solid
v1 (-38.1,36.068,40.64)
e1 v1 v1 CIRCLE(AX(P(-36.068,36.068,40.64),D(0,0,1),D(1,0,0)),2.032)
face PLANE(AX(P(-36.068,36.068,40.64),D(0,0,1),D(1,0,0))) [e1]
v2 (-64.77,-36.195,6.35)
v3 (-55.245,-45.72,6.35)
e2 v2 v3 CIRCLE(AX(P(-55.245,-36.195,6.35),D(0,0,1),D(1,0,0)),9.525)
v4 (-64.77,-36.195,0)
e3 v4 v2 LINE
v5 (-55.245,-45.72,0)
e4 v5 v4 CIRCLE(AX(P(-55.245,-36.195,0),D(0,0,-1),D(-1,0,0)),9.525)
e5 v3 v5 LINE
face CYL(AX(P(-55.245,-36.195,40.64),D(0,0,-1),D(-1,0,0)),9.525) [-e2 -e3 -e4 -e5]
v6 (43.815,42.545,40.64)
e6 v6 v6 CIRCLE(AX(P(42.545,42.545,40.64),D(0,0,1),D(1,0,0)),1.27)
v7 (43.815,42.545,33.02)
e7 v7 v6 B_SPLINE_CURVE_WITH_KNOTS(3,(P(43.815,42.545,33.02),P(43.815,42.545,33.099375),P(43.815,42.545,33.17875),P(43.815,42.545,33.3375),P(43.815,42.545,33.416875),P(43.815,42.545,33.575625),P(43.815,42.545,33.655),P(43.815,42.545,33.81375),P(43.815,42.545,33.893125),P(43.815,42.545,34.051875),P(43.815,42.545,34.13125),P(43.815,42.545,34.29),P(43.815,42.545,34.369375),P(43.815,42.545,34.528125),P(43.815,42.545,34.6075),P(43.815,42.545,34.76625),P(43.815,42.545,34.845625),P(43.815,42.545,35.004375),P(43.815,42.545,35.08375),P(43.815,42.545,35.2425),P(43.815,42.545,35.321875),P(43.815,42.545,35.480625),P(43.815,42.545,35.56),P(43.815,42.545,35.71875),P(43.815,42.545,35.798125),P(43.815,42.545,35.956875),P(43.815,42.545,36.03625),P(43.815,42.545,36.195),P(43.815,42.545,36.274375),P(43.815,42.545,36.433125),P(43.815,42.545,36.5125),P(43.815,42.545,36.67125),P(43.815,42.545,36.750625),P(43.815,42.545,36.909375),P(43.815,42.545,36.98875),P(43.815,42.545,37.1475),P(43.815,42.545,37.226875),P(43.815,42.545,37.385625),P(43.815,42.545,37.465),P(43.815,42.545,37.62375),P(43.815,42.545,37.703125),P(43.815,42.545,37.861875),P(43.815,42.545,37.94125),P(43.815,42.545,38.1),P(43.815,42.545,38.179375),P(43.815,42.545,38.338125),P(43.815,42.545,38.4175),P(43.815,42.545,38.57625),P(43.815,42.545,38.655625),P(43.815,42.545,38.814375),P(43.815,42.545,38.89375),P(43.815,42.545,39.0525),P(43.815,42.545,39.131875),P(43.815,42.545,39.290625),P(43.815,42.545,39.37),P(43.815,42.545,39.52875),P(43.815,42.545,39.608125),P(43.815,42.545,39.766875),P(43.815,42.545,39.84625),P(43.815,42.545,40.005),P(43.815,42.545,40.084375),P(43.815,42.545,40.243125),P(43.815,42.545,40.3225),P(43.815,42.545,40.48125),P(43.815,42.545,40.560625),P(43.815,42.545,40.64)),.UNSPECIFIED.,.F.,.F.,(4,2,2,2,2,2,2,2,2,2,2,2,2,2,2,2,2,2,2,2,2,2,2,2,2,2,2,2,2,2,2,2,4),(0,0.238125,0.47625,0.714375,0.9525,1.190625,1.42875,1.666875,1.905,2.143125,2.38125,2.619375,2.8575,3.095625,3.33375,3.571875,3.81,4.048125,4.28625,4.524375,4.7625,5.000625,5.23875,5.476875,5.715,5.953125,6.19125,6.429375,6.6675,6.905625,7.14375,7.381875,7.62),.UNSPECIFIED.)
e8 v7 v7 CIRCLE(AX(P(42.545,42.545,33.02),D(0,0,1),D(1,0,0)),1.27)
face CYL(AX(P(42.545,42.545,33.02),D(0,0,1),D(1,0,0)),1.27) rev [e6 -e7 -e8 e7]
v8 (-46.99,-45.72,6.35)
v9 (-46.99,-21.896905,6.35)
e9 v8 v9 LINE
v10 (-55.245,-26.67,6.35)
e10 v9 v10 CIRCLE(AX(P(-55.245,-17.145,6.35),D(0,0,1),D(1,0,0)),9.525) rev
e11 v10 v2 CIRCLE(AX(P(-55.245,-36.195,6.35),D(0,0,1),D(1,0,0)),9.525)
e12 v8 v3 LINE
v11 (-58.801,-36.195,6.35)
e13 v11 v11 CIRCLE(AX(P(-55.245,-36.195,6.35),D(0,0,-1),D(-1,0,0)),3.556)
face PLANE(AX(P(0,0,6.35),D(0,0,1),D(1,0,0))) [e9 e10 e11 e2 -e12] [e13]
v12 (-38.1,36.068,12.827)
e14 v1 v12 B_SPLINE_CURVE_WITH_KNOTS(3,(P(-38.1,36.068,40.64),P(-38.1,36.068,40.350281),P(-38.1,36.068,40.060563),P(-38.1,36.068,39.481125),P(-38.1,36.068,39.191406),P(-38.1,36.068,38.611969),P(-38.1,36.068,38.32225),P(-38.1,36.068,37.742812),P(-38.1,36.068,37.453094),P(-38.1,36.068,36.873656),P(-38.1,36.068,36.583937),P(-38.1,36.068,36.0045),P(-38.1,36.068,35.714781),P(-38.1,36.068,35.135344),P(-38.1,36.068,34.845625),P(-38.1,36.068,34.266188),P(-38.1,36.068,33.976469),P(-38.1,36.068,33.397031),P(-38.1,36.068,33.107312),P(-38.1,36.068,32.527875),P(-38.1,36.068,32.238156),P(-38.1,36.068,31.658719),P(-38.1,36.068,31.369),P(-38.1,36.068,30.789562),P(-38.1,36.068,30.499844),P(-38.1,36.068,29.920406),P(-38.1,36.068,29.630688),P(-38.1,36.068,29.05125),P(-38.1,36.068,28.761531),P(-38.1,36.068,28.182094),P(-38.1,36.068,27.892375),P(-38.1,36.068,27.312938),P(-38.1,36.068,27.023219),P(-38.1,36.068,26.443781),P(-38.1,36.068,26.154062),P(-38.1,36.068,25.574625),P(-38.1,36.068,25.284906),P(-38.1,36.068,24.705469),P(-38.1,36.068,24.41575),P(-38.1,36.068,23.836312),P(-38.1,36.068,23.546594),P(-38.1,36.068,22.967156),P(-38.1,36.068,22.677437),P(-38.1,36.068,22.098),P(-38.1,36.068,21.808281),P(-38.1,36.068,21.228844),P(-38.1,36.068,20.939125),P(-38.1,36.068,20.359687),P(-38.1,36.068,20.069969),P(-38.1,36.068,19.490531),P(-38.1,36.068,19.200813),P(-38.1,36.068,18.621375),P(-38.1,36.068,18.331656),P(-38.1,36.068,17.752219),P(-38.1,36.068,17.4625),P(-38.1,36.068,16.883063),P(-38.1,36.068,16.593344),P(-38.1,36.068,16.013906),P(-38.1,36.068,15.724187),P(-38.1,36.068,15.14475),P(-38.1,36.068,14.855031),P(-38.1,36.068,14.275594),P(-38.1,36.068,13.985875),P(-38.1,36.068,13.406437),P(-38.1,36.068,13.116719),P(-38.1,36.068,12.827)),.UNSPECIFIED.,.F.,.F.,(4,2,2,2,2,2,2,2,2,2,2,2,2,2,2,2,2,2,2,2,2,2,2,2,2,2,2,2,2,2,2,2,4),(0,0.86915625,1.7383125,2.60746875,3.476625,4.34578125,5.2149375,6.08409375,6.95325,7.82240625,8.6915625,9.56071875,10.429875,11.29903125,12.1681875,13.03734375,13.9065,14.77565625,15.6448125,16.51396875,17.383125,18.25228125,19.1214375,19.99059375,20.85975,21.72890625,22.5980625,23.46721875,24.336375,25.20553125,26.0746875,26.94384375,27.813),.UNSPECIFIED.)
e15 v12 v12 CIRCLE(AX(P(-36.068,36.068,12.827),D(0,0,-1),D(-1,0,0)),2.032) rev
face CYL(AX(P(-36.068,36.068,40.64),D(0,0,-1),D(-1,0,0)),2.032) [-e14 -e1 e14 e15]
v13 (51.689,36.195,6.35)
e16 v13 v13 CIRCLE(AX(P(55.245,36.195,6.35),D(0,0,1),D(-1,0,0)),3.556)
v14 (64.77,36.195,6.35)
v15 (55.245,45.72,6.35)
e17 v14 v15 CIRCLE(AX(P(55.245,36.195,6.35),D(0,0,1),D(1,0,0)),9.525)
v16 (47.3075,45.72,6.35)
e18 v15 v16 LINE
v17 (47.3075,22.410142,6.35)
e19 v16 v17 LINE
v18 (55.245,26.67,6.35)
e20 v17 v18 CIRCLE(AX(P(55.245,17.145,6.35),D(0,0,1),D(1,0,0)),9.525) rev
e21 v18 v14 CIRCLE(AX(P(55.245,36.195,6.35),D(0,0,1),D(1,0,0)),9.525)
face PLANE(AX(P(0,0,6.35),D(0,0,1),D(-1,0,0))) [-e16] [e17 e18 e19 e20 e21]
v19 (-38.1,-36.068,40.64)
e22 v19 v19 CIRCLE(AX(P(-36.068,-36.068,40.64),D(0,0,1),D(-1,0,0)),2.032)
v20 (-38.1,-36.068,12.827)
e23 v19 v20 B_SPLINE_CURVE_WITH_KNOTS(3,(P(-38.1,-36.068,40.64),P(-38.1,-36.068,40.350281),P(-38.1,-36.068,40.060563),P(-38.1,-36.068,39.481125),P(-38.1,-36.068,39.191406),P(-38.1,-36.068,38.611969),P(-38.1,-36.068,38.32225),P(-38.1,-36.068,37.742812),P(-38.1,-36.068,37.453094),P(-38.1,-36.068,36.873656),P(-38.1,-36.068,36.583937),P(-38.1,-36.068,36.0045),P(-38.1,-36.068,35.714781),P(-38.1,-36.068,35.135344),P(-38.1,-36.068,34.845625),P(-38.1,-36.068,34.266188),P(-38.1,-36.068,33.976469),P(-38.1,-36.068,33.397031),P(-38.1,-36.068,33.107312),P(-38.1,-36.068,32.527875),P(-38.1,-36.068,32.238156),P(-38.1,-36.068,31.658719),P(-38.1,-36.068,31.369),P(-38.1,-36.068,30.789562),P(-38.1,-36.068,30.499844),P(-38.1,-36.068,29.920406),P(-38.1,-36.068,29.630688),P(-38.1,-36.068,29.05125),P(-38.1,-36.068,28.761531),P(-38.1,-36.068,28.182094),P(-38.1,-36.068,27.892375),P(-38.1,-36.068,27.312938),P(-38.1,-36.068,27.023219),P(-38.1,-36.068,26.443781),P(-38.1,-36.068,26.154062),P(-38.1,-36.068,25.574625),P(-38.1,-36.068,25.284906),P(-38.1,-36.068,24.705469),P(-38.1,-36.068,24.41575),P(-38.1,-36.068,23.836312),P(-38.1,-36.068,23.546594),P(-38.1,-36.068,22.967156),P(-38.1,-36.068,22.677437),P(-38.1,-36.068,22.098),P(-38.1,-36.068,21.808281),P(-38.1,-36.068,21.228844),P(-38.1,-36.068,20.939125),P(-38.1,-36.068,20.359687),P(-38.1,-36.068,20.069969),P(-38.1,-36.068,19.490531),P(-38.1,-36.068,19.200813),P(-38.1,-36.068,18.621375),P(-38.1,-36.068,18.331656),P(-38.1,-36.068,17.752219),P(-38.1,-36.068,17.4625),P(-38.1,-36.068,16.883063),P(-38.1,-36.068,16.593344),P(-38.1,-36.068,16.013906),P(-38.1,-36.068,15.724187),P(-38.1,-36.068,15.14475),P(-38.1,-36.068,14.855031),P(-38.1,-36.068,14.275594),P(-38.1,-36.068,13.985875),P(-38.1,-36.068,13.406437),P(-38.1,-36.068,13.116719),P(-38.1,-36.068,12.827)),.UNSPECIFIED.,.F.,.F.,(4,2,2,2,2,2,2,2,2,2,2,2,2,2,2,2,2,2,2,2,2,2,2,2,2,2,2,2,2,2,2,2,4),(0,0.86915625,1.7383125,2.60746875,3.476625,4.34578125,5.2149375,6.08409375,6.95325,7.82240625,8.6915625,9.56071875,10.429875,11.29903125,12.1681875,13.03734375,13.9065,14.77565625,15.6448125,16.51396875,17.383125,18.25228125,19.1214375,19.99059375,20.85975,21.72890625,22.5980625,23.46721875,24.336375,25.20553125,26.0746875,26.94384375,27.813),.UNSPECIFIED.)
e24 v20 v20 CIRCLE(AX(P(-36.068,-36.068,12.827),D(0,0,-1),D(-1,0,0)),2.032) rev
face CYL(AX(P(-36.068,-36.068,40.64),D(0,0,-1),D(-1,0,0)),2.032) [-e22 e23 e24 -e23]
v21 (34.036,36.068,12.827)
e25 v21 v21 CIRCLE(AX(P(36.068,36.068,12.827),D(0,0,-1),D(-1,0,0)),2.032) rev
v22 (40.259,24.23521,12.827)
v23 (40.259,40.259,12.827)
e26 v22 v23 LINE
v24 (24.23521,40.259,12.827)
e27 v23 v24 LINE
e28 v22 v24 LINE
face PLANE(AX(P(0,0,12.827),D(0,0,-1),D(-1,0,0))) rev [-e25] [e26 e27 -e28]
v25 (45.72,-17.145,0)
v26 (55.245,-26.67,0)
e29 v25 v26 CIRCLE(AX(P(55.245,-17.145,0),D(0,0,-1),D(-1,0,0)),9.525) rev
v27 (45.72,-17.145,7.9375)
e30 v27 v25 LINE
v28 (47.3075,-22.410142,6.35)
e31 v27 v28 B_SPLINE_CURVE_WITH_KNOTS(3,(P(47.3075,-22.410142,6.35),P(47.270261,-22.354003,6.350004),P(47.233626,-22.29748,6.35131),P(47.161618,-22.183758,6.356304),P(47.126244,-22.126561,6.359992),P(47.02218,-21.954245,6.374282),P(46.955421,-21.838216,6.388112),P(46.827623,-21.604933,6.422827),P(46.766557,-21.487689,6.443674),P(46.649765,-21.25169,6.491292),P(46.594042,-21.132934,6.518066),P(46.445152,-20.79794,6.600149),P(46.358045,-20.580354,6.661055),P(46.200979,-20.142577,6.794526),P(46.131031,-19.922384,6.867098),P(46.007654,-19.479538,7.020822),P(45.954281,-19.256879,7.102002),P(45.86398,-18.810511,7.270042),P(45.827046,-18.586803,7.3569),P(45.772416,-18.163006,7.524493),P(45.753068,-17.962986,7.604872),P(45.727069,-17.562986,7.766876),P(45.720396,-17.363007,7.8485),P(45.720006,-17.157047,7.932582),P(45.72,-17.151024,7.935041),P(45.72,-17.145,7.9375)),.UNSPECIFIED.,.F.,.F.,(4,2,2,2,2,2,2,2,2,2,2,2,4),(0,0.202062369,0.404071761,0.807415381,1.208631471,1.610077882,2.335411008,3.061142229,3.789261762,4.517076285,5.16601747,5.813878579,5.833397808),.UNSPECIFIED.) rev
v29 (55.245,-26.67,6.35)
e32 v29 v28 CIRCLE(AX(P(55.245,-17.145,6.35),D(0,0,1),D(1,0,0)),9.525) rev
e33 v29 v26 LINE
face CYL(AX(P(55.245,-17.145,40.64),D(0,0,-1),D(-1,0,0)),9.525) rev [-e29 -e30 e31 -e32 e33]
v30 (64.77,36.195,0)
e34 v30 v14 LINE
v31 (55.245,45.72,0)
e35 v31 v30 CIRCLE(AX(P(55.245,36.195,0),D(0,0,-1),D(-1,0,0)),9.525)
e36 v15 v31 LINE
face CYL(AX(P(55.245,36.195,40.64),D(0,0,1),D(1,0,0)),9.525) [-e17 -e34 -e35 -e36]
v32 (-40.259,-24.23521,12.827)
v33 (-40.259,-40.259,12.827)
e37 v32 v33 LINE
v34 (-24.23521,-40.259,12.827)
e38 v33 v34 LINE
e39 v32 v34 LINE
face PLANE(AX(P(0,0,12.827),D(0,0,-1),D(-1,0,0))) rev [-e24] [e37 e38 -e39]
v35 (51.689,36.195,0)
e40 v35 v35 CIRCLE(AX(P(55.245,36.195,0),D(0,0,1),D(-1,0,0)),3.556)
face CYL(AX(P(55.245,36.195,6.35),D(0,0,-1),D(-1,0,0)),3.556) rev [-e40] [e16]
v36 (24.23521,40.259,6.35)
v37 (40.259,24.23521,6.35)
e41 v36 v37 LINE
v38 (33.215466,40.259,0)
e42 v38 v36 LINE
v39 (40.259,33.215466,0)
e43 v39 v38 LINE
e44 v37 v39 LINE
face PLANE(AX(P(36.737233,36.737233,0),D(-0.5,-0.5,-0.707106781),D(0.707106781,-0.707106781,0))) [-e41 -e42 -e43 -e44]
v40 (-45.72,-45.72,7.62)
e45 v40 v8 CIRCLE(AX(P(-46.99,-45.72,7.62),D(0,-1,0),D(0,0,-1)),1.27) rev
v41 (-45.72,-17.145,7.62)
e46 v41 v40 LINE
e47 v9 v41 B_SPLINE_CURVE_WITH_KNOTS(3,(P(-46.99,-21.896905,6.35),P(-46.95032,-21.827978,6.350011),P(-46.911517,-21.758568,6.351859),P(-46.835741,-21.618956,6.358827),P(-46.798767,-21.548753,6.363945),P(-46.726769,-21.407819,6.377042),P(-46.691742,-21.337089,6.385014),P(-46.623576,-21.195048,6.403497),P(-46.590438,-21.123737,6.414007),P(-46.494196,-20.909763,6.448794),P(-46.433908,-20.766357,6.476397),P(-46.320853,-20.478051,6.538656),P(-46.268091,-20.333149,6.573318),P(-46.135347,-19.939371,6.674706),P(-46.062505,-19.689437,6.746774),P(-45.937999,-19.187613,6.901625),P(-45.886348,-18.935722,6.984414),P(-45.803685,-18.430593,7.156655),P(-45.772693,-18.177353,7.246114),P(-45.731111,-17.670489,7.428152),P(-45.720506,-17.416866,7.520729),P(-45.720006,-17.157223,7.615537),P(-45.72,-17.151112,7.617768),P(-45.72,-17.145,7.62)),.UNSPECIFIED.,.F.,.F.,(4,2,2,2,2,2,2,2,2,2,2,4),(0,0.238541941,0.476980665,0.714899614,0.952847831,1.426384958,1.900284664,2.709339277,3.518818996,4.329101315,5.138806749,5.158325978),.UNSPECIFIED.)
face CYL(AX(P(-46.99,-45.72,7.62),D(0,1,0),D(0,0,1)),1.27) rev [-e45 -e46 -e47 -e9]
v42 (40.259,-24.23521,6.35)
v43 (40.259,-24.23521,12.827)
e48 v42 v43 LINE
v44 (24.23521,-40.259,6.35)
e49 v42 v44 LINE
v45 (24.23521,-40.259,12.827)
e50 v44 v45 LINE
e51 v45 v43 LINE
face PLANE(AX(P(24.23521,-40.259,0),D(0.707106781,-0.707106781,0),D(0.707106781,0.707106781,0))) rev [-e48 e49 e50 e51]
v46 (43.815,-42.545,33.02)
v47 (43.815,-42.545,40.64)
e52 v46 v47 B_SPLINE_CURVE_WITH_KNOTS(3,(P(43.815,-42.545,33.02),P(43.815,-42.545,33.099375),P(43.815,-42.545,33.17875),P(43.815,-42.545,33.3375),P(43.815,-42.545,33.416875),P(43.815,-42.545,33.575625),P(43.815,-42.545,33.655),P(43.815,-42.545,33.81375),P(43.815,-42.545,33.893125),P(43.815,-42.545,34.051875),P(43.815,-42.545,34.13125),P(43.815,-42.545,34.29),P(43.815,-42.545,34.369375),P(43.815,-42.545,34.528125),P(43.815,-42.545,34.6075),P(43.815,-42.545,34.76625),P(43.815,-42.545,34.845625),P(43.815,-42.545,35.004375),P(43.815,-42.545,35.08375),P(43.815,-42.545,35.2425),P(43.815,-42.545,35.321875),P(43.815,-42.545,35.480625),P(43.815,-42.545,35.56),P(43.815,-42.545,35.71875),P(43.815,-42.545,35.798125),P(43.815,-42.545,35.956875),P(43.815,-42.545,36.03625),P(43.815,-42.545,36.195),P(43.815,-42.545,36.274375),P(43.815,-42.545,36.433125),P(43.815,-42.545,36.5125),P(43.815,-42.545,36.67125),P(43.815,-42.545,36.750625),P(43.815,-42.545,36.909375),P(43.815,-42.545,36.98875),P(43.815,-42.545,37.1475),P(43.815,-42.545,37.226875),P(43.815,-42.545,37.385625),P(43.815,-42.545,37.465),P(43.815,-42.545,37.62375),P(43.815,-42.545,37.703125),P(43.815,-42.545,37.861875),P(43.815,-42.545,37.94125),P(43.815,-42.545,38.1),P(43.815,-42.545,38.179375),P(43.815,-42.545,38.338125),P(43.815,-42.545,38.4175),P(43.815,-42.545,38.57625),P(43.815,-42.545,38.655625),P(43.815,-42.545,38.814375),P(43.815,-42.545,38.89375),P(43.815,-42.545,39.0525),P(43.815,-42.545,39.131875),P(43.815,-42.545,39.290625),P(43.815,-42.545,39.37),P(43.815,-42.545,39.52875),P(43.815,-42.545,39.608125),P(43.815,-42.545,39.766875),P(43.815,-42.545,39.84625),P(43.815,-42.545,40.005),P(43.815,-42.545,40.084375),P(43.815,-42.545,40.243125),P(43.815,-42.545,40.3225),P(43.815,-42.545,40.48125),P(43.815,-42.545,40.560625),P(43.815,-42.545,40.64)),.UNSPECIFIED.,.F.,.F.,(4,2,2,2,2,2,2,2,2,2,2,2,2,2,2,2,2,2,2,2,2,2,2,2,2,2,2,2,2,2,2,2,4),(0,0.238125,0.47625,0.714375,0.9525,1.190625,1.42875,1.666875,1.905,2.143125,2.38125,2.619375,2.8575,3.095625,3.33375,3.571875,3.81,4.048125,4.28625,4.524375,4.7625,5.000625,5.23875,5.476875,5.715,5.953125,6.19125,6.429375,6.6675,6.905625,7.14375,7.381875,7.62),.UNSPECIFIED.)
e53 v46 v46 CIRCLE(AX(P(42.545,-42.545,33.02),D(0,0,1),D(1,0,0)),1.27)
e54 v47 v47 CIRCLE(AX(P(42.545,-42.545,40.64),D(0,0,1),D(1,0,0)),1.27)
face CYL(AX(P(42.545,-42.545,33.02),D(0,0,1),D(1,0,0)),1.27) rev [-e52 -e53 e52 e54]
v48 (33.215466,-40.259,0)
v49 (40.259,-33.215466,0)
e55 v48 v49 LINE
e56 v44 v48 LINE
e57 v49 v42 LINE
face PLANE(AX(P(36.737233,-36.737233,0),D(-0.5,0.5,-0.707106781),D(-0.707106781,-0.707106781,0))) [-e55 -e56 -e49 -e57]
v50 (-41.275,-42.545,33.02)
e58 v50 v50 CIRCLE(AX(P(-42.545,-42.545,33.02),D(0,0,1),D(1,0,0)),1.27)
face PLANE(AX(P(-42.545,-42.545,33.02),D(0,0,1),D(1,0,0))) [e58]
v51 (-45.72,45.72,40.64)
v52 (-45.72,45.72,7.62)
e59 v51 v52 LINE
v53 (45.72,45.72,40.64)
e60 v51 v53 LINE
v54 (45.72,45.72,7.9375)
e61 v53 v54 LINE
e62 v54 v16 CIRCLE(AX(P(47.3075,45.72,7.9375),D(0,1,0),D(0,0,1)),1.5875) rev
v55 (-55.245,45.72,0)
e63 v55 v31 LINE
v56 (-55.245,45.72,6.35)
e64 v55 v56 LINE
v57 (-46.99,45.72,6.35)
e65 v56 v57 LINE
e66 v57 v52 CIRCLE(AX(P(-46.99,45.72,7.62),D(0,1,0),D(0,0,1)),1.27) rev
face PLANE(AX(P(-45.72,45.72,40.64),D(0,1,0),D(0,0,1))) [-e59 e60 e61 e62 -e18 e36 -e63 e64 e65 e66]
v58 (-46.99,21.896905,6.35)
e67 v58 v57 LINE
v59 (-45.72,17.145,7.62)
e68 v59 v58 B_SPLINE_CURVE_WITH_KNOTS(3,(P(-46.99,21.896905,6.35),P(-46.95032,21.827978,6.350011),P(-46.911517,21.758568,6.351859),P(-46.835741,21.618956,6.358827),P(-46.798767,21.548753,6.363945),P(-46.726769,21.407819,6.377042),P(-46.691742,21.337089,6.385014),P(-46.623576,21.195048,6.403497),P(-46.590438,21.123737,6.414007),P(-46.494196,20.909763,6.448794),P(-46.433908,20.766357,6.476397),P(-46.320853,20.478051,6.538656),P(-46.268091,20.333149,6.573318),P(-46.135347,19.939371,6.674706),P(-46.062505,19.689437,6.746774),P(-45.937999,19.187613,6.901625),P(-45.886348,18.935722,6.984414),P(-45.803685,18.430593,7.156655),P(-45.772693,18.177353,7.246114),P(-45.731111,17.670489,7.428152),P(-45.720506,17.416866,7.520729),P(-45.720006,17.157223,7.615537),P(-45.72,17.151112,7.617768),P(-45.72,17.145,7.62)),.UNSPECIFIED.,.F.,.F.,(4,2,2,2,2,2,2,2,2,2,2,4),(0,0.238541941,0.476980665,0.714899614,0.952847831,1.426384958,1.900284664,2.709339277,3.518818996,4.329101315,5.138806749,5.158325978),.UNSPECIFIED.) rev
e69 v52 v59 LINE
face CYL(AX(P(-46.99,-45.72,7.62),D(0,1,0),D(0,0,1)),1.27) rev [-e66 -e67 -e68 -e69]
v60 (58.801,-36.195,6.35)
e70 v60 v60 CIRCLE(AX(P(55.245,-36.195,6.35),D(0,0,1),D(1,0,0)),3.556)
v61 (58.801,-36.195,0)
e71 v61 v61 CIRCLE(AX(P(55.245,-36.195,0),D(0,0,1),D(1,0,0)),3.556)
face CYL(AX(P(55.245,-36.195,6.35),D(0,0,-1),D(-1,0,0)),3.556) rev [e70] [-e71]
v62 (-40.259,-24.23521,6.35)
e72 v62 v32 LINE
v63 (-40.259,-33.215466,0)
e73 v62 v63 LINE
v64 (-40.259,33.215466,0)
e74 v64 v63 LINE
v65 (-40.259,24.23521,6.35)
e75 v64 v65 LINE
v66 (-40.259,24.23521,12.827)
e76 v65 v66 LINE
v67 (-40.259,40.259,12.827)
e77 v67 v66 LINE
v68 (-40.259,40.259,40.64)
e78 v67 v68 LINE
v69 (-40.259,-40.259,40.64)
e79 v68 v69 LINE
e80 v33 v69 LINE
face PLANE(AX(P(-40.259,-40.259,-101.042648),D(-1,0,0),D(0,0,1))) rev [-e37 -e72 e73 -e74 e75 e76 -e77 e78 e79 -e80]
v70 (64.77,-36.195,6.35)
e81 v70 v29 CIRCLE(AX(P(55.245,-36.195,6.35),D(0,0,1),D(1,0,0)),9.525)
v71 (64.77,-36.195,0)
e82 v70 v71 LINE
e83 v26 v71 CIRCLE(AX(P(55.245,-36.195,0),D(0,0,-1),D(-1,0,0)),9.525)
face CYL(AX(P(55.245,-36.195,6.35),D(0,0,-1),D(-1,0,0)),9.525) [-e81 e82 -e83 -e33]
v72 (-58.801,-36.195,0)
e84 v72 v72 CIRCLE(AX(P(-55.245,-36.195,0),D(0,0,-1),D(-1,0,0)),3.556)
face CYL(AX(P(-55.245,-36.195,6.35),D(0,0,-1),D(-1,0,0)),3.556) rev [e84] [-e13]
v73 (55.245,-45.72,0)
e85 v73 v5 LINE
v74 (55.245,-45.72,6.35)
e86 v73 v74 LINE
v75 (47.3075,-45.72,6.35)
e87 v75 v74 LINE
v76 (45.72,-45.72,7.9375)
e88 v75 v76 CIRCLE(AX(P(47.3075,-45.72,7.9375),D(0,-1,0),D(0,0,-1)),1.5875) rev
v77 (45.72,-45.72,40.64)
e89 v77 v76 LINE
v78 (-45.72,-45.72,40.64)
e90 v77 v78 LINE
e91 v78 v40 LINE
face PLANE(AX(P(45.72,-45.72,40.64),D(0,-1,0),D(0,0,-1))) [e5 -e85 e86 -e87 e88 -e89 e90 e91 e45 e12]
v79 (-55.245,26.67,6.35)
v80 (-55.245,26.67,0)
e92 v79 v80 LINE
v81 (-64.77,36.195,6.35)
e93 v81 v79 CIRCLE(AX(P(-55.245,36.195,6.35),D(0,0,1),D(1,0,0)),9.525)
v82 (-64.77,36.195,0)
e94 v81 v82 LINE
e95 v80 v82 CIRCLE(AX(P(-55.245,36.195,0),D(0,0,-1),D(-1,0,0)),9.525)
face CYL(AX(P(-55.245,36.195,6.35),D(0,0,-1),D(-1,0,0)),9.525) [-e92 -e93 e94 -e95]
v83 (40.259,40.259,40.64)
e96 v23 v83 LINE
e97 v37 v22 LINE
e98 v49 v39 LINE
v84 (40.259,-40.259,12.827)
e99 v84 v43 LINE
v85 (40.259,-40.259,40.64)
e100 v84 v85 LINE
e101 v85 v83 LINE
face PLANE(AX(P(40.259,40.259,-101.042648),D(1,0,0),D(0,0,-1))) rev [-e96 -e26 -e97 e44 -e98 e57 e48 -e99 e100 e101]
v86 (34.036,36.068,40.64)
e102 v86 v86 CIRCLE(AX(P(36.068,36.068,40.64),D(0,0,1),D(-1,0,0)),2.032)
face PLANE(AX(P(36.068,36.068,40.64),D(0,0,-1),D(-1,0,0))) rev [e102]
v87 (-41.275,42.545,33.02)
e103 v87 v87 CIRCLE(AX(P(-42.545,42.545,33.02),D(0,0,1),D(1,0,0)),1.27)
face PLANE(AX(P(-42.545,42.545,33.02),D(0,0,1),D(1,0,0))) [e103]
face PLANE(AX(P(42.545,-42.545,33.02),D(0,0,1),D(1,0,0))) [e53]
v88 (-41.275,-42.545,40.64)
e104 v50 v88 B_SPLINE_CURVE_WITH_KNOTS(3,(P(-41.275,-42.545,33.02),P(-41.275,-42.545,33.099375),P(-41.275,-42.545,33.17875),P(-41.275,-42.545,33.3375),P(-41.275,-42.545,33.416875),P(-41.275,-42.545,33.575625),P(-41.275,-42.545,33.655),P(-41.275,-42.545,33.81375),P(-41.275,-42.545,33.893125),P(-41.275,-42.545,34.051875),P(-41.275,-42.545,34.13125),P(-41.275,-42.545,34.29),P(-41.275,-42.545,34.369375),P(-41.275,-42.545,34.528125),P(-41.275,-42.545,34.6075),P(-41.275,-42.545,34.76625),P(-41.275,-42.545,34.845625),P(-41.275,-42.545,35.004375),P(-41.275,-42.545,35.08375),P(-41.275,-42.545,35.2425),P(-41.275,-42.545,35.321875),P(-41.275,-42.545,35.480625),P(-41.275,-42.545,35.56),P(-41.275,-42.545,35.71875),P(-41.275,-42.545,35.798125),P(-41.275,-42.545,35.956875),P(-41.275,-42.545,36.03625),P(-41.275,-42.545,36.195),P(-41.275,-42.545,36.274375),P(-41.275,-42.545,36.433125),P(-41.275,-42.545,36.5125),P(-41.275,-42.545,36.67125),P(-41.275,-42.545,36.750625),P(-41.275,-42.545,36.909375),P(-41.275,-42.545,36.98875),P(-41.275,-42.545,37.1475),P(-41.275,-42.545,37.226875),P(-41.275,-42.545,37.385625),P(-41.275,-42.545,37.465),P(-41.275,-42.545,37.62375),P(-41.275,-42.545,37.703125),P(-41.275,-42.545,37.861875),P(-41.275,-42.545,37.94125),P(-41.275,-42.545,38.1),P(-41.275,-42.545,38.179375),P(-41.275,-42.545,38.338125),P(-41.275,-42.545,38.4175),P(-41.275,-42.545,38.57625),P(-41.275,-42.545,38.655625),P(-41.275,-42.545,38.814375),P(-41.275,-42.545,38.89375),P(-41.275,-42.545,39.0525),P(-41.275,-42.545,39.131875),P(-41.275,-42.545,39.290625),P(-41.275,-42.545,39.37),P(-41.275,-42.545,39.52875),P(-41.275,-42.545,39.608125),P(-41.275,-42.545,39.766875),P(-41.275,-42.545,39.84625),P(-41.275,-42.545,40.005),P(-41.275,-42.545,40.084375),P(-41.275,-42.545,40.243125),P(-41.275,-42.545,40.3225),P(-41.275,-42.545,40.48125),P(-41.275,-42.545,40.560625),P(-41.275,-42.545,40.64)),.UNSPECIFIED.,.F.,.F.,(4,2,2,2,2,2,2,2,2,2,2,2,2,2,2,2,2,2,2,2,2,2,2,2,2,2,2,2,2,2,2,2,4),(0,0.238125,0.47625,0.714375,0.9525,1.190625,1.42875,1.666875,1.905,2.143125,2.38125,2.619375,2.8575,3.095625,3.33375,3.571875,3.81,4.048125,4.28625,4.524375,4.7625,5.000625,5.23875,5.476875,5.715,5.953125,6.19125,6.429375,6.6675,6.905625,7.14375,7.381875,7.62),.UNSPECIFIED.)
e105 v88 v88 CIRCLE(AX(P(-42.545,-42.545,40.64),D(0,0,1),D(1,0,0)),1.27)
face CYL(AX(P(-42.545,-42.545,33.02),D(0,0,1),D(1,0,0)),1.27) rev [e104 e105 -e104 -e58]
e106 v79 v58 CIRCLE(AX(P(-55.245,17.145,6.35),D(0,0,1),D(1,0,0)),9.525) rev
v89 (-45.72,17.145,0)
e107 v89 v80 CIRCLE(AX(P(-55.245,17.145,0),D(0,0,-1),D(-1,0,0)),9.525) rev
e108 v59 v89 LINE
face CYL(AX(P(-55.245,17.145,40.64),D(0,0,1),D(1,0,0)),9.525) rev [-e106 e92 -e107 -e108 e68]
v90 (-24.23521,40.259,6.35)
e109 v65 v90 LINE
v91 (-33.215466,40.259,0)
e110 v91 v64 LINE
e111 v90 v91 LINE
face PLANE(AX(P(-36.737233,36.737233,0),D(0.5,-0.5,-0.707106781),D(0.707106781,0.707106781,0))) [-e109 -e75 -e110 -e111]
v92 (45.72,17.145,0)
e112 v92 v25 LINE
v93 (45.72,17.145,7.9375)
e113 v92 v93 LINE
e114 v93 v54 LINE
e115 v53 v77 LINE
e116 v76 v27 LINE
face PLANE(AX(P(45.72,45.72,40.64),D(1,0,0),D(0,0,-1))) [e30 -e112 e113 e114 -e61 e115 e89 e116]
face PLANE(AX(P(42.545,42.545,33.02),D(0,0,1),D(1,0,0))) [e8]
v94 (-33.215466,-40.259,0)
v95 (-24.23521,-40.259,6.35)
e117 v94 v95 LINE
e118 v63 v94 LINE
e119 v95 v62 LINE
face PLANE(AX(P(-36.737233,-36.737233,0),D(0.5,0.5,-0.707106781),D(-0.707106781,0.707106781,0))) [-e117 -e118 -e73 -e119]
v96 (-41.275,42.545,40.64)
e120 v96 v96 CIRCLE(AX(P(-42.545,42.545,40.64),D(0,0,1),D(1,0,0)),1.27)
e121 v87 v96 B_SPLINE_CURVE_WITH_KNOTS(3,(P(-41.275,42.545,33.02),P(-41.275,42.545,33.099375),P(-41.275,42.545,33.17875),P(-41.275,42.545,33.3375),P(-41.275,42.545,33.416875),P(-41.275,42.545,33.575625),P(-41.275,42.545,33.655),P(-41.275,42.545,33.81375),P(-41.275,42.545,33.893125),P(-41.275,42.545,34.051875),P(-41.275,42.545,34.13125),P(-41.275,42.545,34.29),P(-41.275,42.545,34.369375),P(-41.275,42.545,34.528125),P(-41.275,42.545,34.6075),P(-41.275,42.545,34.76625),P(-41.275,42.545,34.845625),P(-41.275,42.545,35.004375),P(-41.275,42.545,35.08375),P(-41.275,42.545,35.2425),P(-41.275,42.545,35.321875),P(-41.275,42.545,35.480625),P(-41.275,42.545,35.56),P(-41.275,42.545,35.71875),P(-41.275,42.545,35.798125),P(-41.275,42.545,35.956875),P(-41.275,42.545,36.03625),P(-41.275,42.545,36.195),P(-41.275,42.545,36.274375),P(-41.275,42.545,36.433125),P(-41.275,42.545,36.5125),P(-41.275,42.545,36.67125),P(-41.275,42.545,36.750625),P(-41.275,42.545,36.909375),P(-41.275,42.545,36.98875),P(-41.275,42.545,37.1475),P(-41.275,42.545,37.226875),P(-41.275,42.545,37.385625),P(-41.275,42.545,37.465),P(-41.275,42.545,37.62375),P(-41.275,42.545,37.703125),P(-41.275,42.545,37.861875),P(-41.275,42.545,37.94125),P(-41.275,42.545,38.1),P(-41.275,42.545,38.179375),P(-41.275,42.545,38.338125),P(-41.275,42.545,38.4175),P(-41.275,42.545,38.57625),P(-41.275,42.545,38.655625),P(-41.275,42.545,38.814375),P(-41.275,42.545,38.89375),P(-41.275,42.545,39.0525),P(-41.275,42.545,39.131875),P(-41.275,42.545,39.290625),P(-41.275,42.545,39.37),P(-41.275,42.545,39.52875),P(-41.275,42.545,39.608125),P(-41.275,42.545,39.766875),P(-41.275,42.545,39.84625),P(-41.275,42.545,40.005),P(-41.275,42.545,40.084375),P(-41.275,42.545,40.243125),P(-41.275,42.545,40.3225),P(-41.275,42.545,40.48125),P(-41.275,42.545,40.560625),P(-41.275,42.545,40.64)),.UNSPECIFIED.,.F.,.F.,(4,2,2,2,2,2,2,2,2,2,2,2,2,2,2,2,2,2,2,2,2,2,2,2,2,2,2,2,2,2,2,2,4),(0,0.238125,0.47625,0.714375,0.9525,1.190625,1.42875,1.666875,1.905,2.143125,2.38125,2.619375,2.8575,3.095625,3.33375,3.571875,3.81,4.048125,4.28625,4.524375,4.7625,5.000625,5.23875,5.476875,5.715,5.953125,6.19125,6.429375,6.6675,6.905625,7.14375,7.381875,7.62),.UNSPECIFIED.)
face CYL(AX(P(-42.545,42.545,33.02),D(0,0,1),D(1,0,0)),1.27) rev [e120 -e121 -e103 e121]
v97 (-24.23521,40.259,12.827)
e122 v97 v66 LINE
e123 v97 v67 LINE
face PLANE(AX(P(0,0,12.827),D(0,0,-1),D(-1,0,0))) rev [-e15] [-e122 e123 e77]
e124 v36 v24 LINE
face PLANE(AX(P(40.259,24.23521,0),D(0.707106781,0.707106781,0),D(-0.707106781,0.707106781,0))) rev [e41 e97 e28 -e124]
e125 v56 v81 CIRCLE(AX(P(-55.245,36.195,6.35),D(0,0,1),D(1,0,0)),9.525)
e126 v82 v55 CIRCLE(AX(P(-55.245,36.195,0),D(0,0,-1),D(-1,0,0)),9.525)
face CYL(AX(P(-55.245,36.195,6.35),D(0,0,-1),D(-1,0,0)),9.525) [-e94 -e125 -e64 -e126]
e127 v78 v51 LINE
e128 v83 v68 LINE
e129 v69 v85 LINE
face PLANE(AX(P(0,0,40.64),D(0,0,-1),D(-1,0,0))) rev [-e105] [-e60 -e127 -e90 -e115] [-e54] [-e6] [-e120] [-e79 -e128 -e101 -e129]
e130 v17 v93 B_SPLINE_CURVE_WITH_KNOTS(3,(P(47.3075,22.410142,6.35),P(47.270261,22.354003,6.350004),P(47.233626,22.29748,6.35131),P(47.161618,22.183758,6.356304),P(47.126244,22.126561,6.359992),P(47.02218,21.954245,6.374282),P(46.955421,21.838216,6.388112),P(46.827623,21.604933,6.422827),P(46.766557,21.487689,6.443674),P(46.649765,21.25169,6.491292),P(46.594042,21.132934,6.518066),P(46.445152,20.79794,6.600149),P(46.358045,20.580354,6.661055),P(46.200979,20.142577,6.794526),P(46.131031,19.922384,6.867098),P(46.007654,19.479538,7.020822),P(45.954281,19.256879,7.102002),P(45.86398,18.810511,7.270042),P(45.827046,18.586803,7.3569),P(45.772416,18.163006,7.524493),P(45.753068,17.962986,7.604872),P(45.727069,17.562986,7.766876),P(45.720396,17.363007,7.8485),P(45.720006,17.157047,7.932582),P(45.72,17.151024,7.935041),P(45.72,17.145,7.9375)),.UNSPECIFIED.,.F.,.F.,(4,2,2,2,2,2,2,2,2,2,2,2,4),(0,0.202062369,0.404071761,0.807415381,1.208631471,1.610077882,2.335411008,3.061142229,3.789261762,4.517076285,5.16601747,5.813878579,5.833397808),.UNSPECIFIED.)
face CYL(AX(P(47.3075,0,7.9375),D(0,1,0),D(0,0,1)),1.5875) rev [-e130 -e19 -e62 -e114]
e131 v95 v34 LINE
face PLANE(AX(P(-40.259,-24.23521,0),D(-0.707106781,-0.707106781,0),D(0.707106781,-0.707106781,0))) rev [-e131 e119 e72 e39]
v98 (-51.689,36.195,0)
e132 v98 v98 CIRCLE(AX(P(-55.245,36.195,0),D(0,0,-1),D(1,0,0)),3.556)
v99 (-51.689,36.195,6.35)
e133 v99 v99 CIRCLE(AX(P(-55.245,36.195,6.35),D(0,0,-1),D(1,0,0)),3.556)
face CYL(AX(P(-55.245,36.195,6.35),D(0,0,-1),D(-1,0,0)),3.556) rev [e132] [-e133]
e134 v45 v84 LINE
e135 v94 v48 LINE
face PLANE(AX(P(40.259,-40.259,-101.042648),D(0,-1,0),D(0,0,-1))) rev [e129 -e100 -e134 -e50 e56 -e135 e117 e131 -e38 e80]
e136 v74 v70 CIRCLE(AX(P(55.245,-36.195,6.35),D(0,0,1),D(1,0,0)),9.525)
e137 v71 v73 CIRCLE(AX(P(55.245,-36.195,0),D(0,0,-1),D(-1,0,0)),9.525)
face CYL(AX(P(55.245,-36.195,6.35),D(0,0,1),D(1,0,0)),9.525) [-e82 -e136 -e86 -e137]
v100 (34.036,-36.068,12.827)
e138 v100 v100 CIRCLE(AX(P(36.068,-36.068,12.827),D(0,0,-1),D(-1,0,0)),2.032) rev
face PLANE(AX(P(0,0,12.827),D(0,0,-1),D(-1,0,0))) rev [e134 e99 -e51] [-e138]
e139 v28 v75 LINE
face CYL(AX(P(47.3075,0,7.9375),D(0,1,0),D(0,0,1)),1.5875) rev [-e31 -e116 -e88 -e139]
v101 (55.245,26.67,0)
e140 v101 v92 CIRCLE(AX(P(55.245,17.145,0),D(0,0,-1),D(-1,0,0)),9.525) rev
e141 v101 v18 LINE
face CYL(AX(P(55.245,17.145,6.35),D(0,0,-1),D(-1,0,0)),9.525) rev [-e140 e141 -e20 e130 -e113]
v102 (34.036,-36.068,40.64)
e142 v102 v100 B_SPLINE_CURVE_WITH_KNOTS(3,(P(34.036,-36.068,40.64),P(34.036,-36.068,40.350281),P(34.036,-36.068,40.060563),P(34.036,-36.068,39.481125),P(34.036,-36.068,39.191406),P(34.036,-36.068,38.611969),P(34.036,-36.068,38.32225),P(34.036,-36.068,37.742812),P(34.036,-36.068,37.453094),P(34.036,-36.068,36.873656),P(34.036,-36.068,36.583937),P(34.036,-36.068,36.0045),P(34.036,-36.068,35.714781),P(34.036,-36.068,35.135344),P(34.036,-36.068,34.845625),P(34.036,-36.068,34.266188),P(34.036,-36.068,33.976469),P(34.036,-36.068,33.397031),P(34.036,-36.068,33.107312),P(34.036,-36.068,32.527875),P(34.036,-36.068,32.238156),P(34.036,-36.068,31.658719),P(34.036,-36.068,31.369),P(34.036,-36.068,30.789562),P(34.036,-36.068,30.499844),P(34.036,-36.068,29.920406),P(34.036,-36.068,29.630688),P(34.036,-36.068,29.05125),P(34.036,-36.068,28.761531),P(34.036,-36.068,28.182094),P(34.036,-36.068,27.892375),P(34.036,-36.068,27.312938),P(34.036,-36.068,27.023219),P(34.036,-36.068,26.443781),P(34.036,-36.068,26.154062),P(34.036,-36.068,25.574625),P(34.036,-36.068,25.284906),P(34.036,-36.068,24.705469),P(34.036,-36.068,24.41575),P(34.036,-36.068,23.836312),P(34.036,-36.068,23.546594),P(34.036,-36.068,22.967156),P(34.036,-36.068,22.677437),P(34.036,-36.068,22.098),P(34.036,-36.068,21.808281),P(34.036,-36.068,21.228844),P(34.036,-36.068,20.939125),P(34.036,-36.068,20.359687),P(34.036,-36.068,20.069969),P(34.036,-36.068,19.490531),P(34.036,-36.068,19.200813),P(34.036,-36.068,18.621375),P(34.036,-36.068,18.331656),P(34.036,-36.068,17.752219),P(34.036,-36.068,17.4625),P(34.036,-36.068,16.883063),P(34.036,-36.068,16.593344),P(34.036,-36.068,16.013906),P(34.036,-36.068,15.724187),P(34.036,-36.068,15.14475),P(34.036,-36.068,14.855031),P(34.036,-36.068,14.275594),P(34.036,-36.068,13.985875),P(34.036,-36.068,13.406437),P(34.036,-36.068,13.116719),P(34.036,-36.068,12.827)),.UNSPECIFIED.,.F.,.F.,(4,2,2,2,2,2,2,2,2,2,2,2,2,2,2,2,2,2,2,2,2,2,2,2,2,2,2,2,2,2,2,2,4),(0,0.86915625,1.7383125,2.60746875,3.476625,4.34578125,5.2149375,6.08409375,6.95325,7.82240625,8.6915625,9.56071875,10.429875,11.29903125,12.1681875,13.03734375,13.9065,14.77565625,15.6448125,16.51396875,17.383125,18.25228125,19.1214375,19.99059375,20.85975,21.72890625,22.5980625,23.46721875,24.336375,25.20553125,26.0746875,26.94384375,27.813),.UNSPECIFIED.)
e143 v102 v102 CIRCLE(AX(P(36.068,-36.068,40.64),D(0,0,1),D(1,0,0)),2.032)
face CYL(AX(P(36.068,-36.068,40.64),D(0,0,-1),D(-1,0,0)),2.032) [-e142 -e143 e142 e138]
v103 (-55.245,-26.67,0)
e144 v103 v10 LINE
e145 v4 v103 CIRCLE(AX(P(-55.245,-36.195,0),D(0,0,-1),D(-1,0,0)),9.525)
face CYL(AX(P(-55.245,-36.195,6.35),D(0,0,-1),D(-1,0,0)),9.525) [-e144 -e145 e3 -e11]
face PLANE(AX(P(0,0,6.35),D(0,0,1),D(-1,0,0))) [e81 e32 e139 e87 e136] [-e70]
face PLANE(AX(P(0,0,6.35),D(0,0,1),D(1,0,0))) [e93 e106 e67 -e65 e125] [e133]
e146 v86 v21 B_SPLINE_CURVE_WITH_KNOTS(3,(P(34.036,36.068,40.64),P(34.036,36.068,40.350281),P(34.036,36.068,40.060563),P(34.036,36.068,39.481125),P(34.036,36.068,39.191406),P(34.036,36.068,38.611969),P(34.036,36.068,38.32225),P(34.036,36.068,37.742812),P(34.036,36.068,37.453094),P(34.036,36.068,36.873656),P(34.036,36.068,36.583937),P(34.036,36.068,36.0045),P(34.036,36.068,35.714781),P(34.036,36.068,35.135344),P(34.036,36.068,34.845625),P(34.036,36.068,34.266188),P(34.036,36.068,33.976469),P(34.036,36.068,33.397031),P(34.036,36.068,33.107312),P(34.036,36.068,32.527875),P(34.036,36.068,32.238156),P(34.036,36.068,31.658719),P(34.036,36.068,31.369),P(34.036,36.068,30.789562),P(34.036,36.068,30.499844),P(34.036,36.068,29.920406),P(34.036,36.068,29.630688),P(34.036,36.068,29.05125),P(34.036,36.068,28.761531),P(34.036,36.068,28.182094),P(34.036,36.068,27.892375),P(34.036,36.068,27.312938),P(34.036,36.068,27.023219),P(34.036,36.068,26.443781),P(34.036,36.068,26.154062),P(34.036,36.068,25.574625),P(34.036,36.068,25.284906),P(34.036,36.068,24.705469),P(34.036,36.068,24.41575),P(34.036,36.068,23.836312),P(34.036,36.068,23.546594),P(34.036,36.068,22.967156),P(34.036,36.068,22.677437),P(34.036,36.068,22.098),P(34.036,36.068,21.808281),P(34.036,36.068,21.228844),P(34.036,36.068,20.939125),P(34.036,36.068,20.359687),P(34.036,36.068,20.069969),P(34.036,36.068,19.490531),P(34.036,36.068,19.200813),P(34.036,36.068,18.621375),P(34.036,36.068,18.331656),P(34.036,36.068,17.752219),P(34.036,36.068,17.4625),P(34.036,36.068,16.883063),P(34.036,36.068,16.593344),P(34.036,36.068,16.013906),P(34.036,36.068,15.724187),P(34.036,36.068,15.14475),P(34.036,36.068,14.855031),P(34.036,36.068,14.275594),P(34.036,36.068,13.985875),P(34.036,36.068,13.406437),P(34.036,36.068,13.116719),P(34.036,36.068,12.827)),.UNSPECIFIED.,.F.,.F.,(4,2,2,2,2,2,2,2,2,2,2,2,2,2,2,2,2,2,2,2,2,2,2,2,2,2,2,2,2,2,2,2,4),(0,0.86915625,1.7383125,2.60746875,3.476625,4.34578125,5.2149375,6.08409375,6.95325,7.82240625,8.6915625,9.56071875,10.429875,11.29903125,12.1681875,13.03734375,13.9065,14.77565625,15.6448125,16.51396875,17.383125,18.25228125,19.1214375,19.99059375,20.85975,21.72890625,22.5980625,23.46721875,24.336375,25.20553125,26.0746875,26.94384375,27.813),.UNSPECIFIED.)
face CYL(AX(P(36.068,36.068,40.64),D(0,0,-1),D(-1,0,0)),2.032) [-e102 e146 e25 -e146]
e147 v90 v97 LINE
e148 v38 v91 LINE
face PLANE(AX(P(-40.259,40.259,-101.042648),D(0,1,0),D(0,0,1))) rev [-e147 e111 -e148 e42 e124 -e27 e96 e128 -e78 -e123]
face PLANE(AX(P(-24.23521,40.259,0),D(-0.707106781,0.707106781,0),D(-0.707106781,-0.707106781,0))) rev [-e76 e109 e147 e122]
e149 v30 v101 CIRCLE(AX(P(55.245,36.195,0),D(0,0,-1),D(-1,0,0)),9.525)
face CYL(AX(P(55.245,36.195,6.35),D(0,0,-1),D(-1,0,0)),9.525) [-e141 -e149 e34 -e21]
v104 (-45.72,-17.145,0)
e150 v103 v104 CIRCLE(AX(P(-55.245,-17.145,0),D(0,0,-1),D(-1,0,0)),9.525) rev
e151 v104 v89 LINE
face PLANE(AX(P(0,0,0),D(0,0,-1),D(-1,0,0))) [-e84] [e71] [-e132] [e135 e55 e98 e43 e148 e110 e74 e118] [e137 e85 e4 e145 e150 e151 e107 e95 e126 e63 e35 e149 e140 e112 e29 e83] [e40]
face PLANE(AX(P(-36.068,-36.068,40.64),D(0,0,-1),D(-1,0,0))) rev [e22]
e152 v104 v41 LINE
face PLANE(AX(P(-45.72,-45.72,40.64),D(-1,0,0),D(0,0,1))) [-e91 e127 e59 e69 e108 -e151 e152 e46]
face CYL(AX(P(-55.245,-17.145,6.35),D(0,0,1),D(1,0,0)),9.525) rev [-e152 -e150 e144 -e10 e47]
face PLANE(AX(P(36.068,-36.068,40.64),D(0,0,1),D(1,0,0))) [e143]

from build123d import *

# Parameters (mm, degrees)
SKETCH1_W           = 80.01
SKETCH1_H           = 80.01
BOSS_EXTRUDE1_DEPTH = 12.827
SKETCH2_R           = 2.032
BOSS_EXTRUDE2_DEPTH = 27.813
SKETCH3_W           = 91.44
SKETCH3_H           = 91.44
SKETCH3_W_2         = 80.01
SKETCH3_H_2         = 80.01
BOSS_EXTRUDE3_DEPTH = 40.64
CUT_EXTRUDE1_DEPTH  = 71.386076528
SKETCH6_W           = 80.518
SKETCH6_H           = 80.518
SKETCH6_W_2         = 80.01
SKETCH6_H_2         = 80.01
CUT_EXTRUDE2_DEPTH  = 27.813
CUT_EXTRUDE3_DEPTH  = 71.386076528
SKETCH9_W           = 19.05
SKETCH9_H           = 19.05
SKETCH9_R           = 3.556
BOSS_EXTRUDE4_DEPTH = 6.35
FILLET1_R           = 9.525
FILLET2_R           = 1.27
FILLET3_R           = 9.525
FILLET4_R           = 1.5875
SKETCH10_R          = 1.27
CUT_EXTRUDE4_DEPTH  = 7.62
CHAMFER2_SIZE       = 6.35


with BuildPart() as part:
    # Sketch1 → Boss-Extrude1 (new body)
    with BuildSketch(Plane.XY):
        Rectangle(SKETCH1_W, SKETCH1_H)
    extrude(amount=BOSS_EXTRUDE1_DEPTH)

    # Sketch2 → Boss-Extrude2 (add)
    with BuildSketch(Plane.XY.offset(12.827)):
        with Locations(Location((-36.068, 36.068, 0), (0, 0, 180))):
            Circle(SKETCH2_R)
        with Locations(Location((36.068, 36.068, 0), (0, 0, 180))):
            Circle(SKETCH2_R)
        with Locations(Location((36.068, -36.068, 0), (0, 0, 180))):
            Circle(SKETCH2_R)
        with Locations(Location((-36.068, -36.068, 0), (0, 0, 180))):
            Circle(SKETCH2_R)
    extrude(amount=BOSS_EXTRUDE2_DEPTH)

    # Sketch3 → Boss-Extrude3 (add, through all)
    with BuildSketch(Plane(origin=(0, 0, 0), x_dir=(-1, 0, 0), z_dir=(0, 0, -1))):
        Rectangle(SKETCH3_W, SKETCH3_H)
        Rectangle(SKETCH3_W_2, SKETCH3_H_2, mode=Mode.SUBTRACT)
    extrude(amount=-BOSS_EXTRUDE3_DEPTH)

    # Sketch4 → Cut-Extrude1 (cut, through all)
    with BuildSketch(Plane.XY.offset(12.827)):
        Polygon((24.13, 40.005), (40.005, 24.13), (40.005, -24.13), (24.13, -40.005), (-24.13, -40.005), (-40.005, -24.13), (-40.005, 24.13), (-24.13, 40.005), align=None)
    extrude(amount=-CUT_EXTRUDE1_DEPTH, mode=Mode.SUBTRACT)

    # Sketch6 → Cut-Extrude2 (cut)
    with BuildSketch(Plane.XY.offset(40.64)):
        Rectangle(SKETCH6_W, SKETCH6_H)
        Rectangle(SKETCH6_W_2, SKETCH6_H_2, mode=Mode.SUBTRACT)
    extrude(amount=-CUT_EXTRUDE2_DEPTH, mode=Mode.SUBTRACT)

    # Sketch7 → Cut-Extrude3 (cut, through all)
    with BuildSketch(Plane.XY.offset(12.827)):
        Polygon((-40.259, 24.235210245), (-40.259, -24.235210245), (-24.235210245, -40.259), (24.235210245, -40.259), (40.259, -24.235210245), (40.259, 24.235210245), (24.235210245, 40.259), (-24.235210245, 40.259), align=None)
        Polygon((-40.005, 24.13), (-40.005, -24.13), (-24.13, -40.005), (24.13, -40.005), (40.005, -24.13), (40.005, 24.13), (24.13, 40.005), (-24.13, 40.005), align=None, mode=Mode.SUBTRACT)
    extrude(amount=-CUT_EXTRUDE3_DEPTH, mode=Mode.SUBTRACT)

    # Sketch9 → Boss-Extrude4 (add)
    # profile 1 of 2: a face of its own
    with BuildSketch(Plane(origin=(0, 0, 0), x_dir=(-1, 0, 0), z_dir=(0, 0, -1))):
        with Locations((55.245, -36.195)):
            Rectangle(SKETCH9_W, SKETCH9_H)
        with Locations((55.245, -36.195)):
            Circle(SKETCH9_R, mode=Mode.SUBTRACT)
    # profile 2 of 2: a face of its own
    with BuildSketch(Plane(origin=(0, 0, 0), x_dir=(-1, 0, 0), z_dir=(0, 0, -1))):
        with Locations((55.245, 36.195)):
            Rectangle(SKETCH9_W, SKETCH9_H)
        with Locations(Location((55.245, 36.195, 0), (0, 0, 180))):
            Circle(SKETCH9_R, mode=Mode.SUBTRACT)
    boss_extrude4 = extrude(amount=-BOSS_EXTRUDE4_DEPTH)

    # Fillet1
    fillet1_edges = [part.edges().sort_by_distance(p)[0] for p in [
        (-45.72, 26.67, 3.175),
        (-45.72, -26.67, 3.175),
        (-64.77, -45.72, 3.175),
        (-64.77, -26.67, 3.175),
        (-64.77, 26.67, 3.175),
        (-64.77, 45.72, 3.175),
    ]]
    fillet(fillet1_edges, radius=FILLET1_R - 0.0001)  # a hair under: the kernel refuses the full size

    # Fillet2
    fillet2_edges = [part.edges().sort_by_distance(p)[0] for p in [
        (-45.72, -31.43255, 6.35),
        (-45.72, 31.43255, 6.35),
    ]]
    fillet(fillet2_edges, radius=FILLET2_R)

    # Mirror4: Boss-Extrude4 across plane
    add(boss_extrude4.mirror(Plane(origin=(0, 0, 0), x_dir=(0, 0, 1), z_dir=(1, 0, 0))))

    # Fillet3
    fillet3_edges = [part.edges().sort_by_distance(p)[0] for p in [
        (45.72, -26.67, 3.175),
        (64.77, -26.67, 3.175),
        (64.77, -45.72, 3.175),
        (45.72, 26.67, 3.175),
        (64.77, 26.67, 3.175),
        (64.77, 45.72, 3.175),
    ]]
    fillet(fillet3_edges, radius=FILLET3_R - 0.0001)  # a hair under: the kernel refuses the full size

    # Fillet4
    fillet4_edges = [part.edges().sort_by_distance(p)[0] for p in [
        (45.72, -31.43255, 6.35),
        (45.72, 31.43255, 6.35),
    ]]
    fillet(fillet4_edges, radius=FILLET4_R)

    # Sketch10 → Cut-Extrude4 (cut)
    with BuildSketch(Plane.XY.offset(40.64)):
        with Locations((-42.545, 42.545)):
            Circle(SKETCH10_R)
        with Locations((42.545, 42.545)):
            Circle(SKETCH10_R)
        with Locations((42.545, -42.545)):
            Circle(SKETCH10_R)
        with Locations((-42.545, -42.545)):
            Circle(SKETCH10_R)
    extrude(amount=-CUT_EXTRUDE4_DEPTH, mode=Mode.SUBTRACT)

    # Chamfer2
    chamfer2_edges = [part.edges().sort_by_distance(p)[0] for p in [
        (-32.247105122, 32.247105122, 0),
        (32.247105122, 32.247105122, 0),
        (32.247105122, -32.247105122, 0),
        (-32.247105122, -32.247105122, 0),
    ]]
    chamfer(chamfer2_edges, length=CHAMFER2_SIZE)


solid = part.part
